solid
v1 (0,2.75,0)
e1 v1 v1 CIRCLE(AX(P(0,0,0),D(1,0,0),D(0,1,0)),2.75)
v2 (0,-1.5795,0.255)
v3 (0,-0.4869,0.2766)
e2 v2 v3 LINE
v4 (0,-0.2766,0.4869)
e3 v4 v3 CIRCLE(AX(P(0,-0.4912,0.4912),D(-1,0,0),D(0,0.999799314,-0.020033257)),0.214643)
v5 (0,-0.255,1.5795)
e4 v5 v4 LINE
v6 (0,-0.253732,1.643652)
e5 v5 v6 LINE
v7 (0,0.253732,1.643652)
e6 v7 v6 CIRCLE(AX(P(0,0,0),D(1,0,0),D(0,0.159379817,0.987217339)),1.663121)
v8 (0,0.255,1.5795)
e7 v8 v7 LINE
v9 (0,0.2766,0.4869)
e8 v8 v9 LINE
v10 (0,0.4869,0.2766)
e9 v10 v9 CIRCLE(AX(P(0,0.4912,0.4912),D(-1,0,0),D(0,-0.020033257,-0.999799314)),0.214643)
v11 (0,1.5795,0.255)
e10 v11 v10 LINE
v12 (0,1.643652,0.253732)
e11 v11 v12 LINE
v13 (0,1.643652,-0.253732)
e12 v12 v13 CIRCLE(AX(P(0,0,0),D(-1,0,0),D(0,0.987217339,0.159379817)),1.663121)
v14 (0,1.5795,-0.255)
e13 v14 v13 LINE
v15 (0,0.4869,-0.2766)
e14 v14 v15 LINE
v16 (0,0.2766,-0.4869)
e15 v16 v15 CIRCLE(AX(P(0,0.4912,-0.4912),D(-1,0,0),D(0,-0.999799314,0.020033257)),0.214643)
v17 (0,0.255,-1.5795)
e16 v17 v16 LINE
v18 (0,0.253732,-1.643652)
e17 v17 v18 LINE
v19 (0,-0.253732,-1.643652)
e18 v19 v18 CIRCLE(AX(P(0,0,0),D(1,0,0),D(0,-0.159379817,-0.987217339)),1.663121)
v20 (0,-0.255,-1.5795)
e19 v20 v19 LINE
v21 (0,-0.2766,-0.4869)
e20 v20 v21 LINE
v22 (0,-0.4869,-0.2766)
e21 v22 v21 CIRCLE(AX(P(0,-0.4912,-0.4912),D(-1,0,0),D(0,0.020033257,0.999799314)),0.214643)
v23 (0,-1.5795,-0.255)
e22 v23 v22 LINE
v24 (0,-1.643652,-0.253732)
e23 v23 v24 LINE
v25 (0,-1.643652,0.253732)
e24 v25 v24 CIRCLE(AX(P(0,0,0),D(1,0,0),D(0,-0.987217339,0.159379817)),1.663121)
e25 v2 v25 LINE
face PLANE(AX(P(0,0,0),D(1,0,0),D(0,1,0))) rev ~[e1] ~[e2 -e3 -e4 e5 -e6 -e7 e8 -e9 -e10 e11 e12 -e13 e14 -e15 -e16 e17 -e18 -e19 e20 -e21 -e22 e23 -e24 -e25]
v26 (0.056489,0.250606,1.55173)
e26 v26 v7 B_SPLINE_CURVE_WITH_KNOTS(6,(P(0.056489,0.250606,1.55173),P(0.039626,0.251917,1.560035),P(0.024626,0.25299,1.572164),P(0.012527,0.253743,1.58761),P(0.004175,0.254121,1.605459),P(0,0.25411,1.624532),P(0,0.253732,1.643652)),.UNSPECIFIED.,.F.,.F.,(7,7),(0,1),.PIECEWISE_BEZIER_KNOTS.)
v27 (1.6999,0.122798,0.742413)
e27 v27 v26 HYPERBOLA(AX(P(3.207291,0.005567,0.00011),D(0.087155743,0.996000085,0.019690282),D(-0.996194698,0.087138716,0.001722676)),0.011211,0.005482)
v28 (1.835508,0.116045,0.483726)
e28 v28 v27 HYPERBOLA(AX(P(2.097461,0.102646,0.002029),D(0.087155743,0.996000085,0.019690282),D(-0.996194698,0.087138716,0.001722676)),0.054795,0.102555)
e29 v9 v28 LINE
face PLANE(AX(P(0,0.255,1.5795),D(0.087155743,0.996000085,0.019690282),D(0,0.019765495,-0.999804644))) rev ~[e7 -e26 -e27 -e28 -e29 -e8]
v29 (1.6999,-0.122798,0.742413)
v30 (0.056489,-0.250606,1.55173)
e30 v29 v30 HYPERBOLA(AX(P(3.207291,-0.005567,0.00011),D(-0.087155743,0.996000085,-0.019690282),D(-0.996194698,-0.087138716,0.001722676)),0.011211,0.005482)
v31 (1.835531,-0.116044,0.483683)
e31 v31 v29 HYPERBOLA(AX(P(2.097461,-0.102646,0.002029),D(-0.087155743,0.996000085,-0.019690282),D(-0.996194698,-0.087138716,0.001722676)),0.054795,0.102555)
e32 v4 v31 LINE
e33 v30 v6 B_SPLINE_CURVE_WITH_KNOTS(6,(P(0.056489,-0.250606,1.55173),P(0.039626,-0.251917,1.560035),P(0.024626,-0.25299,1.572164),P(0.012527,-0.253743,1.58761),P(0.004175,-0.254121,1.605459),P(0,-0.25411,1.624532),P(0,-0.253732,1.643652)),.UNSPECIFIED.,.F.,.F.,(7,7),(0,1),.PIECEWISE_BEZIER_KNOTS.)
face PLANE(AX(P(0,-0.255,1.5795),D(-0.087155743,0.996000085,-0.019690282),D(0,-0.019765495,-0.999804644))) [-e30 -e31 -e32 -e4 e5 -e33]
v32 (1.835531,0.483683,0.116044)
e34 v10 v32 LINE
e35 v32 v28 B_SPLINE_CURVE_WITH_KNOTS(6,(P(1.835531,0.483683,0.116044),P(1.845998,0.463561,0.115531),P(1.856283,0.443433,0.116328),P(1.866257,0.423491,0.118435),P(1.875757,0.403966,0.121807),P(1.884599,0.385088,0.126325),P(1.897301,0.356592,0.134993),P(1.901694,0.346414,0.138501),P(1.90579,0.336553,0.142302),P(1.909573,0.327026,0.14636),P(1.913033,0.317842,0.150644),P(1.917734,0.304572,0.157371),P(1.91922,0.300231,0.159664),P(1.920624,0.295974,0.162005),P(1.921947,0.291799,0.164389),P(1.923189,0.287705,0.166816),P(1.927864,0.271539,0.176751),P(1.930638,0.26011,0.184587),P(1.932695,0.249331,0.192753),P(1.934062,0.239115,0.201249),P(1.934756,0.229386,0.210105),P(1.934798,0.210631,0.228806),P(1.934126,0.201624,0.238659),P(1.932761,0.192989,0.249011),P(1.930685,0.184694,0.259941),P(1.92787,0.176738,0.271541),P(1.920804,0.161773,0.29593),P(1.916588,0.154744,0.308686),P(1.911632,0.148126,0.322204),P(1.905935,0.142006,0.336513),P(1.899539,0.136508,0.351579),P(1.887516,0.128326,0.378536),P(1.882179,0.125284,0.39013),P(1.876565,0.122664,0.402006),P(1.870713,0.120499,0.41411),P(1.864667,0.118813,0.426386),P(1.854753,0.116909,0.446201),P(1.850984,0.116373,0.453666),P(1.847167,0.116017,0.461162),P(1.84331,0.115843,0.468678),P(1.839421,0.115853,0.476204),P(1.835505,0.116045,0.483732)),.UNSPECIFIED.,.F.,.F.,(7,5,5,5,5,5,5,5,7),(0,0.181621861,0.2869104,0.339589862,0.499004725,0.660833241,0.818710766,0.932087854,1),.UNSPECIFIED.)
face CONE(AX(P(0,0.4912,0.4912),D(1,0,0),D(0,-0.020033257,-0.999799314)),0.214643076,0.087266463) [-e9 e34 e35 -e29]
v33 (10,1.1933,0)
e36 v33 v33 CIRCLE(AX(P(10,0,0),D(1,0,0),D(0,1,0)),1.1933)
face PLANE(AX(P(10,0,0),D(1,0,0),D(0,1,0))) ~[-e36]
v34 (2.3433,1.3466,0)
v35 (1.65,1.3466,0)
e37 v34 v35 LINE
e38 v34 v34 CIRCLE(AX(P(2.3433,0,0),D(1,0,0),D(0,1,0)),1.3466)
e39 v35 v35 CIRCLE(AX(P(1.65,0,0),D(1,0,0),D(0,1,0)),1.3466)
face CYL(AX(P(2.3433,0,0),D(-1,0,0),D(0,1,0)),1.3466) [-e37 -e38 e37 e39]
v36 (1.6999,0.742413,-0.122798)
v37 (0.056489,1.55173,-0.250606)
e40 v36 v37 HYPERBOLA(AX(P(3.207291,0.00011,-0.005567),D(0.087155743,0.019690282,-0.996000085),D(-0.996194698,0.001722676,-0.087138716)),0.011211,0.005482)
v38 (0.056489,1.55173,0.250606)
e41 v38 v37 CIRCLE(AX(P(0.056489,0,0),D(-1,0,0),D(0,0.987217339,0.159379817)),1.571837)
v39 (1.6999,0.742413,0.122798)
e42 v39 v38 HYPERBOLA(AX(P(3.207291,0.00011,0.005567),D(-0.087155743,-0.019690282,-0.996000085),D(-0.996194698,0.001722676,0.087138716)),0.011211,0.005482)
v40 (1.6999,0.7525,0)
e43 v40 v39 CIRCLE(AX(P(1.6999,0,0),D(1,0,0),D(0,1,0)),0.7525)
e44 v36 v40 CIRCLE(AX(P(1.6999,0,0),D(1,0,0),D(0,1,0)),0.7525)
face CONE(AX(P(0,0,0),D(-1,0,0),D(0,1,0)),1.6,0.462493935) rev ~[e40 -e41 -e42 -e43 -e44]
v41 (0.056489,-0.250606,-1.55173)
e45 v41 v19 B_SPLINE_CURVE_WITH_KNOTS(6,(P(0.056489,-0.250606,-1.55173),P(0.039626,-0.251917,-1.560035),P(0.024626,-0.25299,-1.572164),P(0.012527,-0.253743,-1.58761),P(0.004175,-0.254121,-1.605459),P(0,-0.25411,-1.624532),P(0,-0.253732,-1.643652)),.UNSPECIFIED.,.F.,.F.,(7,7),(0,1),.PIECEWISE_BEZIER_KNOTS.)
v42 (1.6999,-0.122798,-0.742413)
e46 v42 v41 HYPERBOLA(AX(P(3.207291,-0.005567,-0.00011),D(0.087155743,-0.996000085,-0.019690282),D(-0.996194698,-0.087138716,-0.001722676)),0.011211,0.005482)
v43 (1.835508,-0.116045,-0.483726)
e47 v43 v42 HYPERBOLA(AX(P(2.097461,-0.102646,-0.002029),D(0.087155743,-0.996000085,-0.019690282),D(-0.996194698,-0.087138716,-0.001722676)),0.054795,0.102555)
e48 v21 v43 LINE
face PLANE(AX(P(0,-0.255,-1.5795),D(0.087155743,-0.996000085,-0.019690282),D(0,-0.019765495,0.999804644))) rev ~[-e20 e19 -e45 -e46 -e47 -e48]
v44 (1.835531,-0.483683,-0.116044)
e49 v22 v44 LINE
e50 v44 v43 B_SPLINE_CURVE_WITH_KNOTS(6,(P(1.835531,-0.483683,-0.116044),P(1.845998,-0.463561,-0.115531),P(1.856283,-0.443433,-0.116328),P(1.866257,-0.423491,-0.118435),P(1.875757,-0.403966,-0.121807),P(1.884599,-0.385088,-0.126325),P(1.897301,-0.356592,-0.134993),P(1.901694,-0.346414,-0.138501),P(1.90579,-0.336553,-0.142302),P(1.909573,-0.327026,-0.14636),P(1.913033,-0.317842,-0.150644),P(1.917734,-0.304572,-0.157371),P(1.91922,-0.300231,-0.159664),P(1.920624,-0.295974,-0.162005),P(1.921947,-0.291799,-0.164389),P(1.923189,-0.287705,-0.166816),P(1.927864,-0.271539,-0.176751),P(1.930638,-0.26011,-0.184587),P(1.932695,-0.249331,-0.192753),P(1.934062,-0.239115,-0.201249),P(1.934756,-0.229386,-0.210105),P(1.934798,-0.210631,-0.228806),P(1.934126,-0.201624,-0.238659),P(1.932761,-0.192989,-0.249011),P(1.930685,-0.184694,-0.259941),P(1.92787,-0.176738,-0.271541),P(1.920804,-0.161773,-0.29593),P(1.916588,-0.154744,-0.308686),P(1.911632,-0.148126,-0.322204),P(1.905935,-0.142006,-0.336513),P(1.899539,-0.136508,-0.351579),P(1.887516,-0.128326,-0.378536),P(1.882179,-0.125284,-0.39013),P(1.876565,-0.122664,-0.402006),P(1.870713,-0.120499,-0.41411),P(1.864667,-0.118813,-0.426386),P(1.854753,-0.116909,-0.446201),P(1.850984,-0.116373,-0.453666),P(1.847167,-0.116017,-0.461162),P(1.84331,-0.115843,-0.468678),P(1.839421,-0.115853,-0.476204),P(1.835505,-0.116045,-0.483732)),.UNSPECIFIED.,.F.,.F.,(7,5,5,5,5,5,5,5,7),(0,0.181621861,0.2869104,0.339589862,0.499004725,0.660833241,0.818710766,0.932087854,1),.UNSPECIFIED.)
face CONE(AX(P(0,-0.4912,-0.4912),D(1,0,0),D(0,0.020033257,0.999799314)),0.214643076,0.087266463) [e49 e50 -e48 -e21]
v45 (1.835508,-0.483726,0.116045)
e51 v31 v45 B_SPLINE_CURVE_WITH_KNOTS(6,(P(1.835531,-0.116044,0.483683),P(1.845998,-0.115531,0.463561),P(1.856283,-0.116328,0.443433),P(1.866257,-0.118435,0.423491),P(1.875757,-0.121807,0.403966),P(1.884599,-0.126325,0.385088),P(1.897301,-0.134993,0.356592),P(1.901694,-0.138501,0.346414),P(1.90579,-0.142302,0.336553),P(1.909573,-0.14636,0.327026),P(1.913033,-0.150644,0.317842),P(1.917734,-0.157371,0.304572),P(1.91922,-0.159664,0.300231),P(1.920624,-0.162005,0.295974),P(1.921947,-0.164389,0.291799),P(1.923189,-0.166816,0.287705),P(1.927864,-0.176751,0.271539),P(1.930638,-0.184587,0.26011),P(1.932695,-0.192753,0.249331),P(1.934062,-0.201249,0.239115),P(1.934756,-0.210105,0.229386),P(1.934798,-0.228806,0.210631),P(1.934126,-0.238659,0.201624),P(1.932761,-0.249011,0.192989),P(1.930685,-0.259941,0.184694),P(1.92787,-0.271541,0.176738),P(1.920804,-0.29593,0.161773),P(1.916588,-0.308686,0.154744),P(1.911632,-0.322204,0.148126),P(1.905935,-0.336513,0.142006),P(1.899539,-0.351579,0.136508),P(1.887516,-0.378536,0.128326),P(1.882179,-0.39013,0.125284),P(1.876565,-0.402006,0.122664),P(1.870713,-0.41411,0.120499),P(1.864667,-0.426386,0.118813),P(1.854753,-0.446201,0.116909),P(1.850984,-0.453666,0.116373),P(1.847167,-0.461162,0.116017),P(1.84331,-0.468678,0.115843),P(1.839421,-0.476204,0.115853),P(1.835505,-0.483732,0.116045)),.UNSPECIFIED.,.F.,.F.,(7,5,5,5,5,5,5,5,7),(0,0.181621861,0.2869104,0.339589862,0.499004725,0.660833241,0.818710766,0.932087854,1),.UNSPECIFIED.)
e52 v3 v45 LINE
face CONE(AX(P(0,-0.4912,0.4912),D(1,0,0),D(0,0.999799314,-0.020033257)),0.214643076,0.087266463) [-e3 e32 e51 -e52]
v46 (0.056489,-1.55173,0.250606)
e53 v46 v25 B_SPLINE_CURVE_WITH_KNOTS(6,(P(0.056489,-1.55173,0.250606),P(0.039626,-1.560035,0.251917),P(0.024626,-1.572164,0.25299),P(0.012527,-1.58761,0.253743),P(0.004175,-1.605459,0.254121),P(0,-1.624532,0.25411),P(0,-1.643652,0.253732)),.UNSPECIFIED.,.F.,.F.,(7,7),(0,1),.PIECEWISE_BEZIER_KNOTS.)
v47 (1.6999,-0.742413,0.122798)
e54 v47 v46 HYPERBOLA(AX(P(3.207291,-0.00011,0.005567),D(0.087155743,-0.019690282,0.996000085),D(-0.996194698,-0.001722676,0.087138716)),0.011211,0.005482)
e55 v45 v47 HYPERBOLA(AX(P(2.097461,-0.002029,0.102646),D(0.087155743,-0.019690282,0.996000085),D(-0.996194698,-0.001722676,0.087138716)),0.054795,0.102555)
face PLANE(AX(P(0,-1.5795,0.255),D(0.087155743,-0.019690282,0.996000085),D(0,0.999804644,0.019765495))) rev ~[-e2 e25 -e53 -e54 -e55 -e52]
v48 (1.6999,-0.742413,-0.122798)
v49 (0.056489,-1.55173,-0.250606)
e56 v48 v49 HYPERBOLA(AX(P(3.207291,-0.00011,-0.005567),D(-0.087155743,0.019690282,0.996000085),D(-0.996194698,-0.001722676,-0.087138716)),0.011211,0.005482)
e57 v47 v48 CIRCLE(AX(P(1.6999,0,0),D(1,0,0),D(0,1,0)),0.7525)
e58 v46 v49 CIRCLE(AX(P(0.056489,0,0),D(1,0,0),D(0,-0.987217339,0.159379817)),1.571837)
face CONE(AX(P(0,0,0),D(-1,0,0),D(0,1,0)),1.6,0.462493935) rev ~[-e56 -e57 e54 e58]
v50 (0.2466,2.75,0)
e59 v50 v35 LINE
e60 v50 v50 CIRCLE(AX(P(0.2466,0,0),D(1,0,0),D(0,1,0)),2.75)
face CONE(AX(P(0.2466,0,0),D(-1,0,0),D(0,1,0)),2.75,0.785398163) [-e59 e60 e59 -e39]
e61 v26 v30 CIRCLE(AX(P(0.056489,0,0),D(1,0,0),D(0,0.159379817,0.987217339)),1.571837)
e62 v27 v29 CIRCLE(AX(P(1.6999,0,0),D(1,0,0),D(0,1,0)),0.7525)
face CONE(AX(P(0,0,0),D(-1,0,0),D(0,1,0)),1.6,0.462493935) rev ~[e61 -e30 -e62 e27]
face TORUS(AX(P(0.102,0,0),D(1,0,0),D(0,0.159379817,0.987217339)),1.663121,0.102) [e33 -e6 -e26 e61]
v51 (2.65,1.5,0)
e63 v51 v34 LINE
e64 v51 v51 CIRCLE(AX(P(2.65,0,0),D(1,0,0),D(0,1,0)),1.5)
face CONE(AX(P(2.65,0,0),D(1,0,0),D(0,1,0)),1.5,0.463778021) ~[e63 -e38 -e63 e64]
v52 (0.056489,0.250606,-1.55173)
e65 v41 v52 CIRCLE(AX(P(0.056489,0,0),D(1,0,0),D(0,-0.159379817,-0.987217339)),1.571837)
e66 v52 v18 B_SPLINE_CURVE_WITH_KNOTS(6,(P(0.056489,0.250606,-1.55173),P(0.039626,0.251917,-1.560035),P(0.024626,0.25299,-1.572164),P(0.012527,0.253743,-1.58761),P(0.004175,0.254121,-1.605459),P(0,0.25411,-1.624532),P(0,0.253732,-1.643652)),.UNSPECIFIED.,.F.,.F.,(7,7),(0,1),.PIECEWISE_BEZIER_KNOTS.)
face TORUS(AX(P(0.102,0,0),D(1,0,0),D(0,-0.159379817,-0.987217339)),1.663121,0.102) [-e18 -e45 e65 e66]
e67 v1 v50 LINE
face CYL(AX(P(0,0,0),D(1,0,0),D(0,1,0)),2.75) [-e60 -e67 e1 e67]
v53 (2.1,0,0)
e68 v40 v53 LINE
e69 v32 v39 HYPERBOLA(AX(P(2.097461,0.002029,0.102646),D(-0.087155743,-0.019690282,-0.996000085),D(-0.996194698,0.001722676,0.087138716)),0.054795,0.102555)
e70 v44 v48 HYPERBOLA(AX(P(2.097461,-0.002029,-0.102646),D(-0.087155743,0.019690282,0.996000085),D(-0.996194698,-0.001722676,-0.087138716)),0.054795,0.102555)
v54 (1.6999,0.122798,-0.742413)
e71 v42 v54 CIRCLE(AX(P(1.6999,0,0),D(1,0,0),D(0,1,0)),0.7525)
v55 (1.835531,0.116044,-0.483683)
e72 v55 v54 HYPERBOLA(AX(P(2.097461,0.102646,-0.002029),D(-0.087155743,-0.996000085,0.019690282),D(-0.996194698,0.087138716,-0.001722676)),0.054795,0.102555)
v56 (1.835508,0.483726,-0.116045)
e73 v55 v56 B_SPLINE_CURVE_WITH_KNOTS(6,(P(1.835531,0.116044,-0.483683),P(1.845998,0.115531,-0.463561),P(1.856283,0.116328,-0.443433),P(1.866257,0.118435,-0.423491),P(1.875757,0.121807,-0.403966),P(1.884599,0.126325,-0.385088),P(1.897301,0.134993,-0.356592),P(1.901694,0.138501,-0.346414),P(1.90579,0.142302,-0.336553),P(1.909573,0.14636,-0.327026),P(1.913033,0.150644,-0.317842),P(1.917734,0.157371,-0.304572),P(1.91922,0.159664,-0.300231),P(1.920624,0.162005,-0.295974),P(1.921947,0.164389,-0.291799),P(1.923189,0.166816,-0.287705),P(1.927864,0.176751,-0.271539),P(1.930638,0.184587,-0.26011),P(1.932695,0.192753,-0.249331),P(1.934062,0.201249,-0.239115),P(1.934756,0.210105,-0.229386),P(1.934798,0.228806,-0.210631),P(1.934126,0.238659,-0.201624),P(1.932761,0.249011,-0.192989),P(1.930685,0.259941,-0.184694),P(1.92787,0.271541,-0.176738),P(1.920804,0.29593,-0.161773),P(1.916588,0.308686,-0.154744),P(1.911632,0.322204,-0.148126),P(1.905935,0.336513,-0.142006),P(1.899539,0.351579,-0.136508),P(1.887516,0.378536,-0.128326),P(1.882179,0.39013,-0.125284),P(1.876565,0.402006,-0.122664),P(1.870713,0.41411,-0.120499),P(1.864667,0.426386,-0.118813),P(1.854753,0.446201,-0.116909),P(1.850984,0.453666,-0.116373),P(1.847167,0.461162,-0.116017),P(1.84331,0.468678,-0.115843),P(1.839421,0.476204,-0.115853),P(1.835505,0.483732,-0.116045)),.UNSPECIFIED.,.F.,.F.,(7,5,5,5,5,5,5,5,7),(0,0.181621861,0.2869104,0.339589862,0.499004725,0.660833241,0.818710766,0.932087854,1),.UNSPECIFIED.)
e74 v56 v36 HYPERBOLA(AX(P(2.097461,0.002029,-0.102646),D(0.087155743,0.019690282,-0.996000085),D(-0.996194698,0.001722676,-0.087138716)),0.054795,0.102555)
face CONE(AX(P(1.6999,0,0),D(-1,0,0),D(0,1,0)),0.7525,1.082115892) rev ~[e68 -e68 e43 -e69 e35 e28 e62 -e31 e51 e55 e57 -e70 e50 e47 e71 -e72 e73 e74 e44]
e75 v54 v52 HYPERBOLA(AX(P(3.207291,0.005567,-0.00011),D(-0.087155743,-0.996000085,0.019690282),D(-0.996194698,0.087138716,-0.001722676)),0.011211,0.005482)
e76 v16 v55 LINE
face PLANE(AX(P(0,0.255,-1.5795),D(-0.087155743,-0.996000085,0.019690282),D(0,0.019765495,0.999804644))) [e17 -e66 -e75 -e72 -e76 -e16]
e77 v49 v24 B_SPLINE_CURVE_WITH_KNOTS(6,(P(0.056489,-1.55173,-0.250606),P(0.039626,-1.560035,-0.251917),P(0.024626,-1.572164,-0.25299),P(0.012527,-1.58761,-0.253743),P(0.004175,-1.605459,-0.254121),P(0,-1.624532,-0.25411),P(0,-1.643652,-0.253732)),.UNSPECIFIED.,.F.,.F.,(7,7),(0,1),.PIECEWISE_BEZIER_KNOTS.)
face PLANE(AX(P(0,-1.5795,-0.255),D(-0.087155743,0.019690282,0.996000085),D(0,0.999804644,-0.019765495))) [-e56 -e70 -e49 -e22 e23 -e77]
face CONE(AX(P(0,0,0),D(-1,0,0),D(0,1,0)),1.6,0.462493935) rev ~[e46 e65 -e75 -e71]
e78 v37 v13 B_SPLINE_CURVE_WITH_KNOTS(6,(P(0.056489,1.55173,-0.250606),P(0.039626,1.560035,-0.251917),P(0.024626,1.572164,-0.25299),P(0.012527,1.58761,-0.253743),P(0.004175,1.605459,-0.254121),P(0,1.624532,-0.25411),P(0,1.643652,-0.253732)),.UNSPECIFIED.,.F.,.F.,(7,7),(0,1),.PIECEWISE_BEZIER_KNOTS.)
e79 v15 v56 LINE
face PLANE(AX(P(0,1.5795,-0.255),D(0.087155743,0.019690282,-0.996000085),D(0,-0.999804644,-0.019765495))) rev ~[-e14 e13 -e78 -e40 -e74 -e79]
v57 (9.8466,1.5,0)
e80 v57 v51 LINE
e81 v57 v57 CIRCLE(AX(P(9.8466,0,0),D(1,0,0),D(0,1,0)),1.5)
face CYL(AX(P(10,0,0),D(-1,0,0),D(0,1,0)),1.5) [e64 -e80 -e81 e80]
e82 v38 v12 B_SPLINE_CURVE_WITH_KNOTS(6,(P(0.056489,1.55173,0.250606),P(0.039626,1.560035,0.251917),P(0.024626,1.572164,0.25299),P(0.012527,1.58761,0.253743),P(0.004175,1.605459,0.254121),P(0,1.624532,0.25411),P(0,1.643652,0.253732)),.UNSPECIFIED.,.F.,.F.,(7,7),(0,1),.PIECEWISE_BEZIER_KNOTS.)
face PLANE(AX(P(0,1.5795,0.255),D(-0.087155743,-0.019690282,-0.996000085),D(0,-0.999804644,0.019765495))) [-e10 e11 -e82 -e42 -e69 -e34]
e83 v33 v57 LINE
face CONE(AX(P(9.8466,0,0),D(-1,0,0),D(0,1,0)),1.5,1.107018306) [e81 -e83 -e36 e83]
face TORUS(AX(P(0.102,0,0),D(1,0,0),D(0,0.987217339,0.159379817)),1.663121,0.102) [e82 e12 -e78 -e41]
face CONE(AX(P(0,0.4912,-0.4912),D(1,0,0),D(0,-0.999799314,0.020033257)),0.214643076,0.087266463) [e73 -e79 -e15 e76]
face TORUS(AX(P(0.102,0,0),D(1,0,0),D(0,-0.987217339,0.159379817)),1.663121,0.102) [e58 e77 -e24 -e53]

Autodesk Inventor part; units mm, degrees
ref_plane "YZ Plane" through (0, 0, 0) normal (1, 0, 0) x (0, 1, 0)
ref_plane "XZ Plane" through (0, 0, 0) normal (0, 1, 0) x (-1, 0, 0)
sketch "Esquisse1" plane through (0, 0, 0) normal (0, 0, 1) x (1, 0, 0)
  line L0 (2.1, 0) -> (10, 0)
  line L1 (10, 0) -> (10, 1.5)
  line L2 (10, 1.5) -> (2.65, 1.5)
  line L3 (2.65, 1.5) -> (2.3433, 1.3466)
  line L4 (2.3433, 1.3466) -> (1.65, 1.3466)
  line L5 (0, 2.75) -> (0, 1.6)
  line L6 (0, 1.6) -> (1.6999, 0.7525)
  line L7 (1.6999, 0.7525) -> (2.1, 0)
  line L8 (-2, 0) -> (12, 0) projected
  line L9 (0, -0.55) -> (0, 3.3) projected
  line L10 (0, 2.75) -> (0.2466, 2.75)
  line L11 (0.2466, 2.75) -> (1.65, 1.3466)
  line L12 (2.65, 1.5) -> (1.4966, 1.5) construction
  dimension "d1" = 7.35
  dimension "d2" = 3
  dimension "d3" = 2.6933
  dimension "d4" = 3.2
  dimension "d5" = 26.5
  dimension "d6" = 62
  dimension "d7" = 2.1
  dimension "d8" = 0.3067
  dimension "d12" = 5.5
  dimension "d13" = 45
  dimension "d15" = 10
  dimension "d24" = 1.65
revolve "Corps" add sketch "Esquisse1" angle 360 about axis through (2.1, 0, 0) along (1, 0, 0) contours L7 L6 L5 L10 L11 L4 L3 L2 L1 L0
sketch "Esquisse2" plane through (0, 0, 0) normal (-1, 0, 0) x (0, 0, 1)
  line L0 (0, 1.6) -> (0, 0) construction
  line L1 (0, 0) -> (1.6, 0) construction
  arc A0 (0.48, 0) -> (0, 0.48) centre (0, 0) ccw construction
  arc A1 (0.56, 0) -> (0, 0.56) centre (0, 0) ccw construction
  arc A2 (1.5795, 0.255) -> (0.255, 1.5795) centre (0, 0) ccw
  line L2 (0, 0) -> (1.1314, 1.1314) construction
  line L3 (0.255, 1.5795) -> (0.2766, 0.4869)
  line L4 (1.5795, 0.255) -> (0.4869, 0.2766)
  arc A3 (0.255, 1.5795) -> (0, 1.6) centre (0, 0) ccw
  arc A4 (1.6, 0) -> (1.5795, 0.255) centre (0, 0) ccw
  line L5 (0, -3.85) -> (0, 3.85) projected
  line L6 (-3.85, 0) -> (3.85, 0) projected
  arc A5 (0.255, -1.5795) -> (1.5795, -0.255) centre (0, 0) ccw
  line L7 (0.255, -1.5795) -> (0.2766, -0.4869)
  line L8 (1.5795, -0.255) -> (0.4869, -0.2766)
  arc A6 (0, -1.6) -> (0.255, -1.5795) centre (0, 0) ccw
  arc A7 (1.5795, -0.255) -> (1.6, 0) centre (0, 0) ccw
  arc A8 (-0.255, 1.5795) -> (-1.5795, 0.255) centre (0, 0) ccw
  line L9 (-0.255, 1.5795) -> (-0.2766, 0.4869)
  line L10 (-1.5795, 0.255) -> (-0.4869, 0.2766)
  arc A9 (0, 1.6) -> (-0.255, 1.5795) centre (0, 0) ccw
  arc A10 (-1.5795, 0.255) -> (-1.6, 0) centre (0, 0) ccw
  arc A11 (-0.255, -1.5795) -> (0, -1.6) centre (0, 0) ccw
  arc A12 (-1.5795, -0.255) -> (-0.255, -1.5795) centre (0, 0) ccw
  arc A13 (-1.6, 0) -> (-1.5795, -0.255) centre (0, 0) ccw
  line L11 (-1.5795, -0.255) -> (-0.4869, -0.2766)
  line L12 (-0.255, -1.5795) -> (-0.2766, -0.4869)
  arc A14 (0.2766, 0.4869) -> (0.4869, 0.2766) centre (0.4912, 0.4912) ccw
  arc A15 (0.4869, -0.2766) -> (0.2766, -0.4869) centre (0.4912, -0.4912) ccw
  arc A16 (-0.4869, 0.2766) -> (-0.2766, 0.4869) centre (-0.4912, 0.4912) ccw
  arc A17 (-0.2766, -0.4869) -> (-0.4869, -0.2766) centre (-0.4912, -0.4912) ccw
  point P0 (1.1314, -1.1314)
  point P1 (-1.1314, 1.1314)
  point P2 (-1.1314, -1.1314)
  dimension "d17" = 0.96
  dimension "d18" = 1.12
  dimension "d19" = 3.2
  dimension "d20" = 45
  dimension "d21" = 0.255
extrude "Rainure" add sketch "Esquisse2" against normal up to next draft 5 contours L4 A14 L3 A2 | A5 L7 A15 L8 | L9 A16 L10 A8 | A12 L11 A17 L12
fillet "Congé1" radius 0.102 4 edges at (0, 1.6, 0) (0, 0, -1.6) (0, -1.6, 0) (0, 0, 1.6)
thread "Filetage" size "M3x0.5" class "6g" standard "ISO Metric profile" length 7.35
chamfer "Chanfrein1" distance 0.3067 distance2 0.1534 1 edges at (10, -1.5, 0) measured on face at (10, -0.5112, 0.3316)
ref_plane "Work Plane2" through (3.35, 0, 0) normal (0, 0, -1) x (1, 0, 0)
equation "\"d1\" = GEL"
equation "\"d2\" = GD"
equation "\"d3\" = BDM"
equation "\"d4\" = SDM"
equation "\"d7\" = INTI"
equation "\"d8\" = GAL"
equation "\"d12\" = KOD"
equation "\"d13\" = 0.5 * SEWI"
equation "\"d15\" = NLG"
equation "\"d24\" = KOH"
equation "\"d17\" = 0.3 * SDM"
equation "\"d18\" = 0.35 * SDM"
equation "\"d19\" = SDM"
equation "\"d21\" = 0.5 * SBR"
equation "\"d23\" = 0.2 * SBR"
equation "\"d10\" = GEL"
equation "\"d25\" = -0.5 * SPD + 0.5 * GD"
equation "\"d26\" = 0.5 * GAL"
equation "\"NLG\" = 10"
equation "\"GEL\" = 7.35"
equation "\"GAL\" = 0.61345 * PTC"
equation "\"SPD\" = NND - 1.2269 * PTC"
equation "\"KOD\" = 5.5"
equation "\"KOH\" = 1.65"
equation "\"SBR\" = 0.51"
equation "\"INTI\" = 2.1"
equation "\"SDM\" = 3.2"
equation "\"GD\" = NND"
equation "\"BDM\" = NND - GAL"
equation "\"SEWI\" = 90deg"
equation "\"d9\" = SDM"
equation "\"GUL\" = 0.61345 * PTC"
equation "\"TOA\" = 30deg"
equation "\"EPV\" = 3.15"
equation "\"THREADDIA\" = 3"
equation "\"PTC\" = 0.5"
equation "\"NND\" = 3"
equation "\"GD1\" = THREADDIA - 1.2269 * PTC"
properties part number "ISO 7046-1 - M3 x 10 - 4.8 - H" material "Acier"
